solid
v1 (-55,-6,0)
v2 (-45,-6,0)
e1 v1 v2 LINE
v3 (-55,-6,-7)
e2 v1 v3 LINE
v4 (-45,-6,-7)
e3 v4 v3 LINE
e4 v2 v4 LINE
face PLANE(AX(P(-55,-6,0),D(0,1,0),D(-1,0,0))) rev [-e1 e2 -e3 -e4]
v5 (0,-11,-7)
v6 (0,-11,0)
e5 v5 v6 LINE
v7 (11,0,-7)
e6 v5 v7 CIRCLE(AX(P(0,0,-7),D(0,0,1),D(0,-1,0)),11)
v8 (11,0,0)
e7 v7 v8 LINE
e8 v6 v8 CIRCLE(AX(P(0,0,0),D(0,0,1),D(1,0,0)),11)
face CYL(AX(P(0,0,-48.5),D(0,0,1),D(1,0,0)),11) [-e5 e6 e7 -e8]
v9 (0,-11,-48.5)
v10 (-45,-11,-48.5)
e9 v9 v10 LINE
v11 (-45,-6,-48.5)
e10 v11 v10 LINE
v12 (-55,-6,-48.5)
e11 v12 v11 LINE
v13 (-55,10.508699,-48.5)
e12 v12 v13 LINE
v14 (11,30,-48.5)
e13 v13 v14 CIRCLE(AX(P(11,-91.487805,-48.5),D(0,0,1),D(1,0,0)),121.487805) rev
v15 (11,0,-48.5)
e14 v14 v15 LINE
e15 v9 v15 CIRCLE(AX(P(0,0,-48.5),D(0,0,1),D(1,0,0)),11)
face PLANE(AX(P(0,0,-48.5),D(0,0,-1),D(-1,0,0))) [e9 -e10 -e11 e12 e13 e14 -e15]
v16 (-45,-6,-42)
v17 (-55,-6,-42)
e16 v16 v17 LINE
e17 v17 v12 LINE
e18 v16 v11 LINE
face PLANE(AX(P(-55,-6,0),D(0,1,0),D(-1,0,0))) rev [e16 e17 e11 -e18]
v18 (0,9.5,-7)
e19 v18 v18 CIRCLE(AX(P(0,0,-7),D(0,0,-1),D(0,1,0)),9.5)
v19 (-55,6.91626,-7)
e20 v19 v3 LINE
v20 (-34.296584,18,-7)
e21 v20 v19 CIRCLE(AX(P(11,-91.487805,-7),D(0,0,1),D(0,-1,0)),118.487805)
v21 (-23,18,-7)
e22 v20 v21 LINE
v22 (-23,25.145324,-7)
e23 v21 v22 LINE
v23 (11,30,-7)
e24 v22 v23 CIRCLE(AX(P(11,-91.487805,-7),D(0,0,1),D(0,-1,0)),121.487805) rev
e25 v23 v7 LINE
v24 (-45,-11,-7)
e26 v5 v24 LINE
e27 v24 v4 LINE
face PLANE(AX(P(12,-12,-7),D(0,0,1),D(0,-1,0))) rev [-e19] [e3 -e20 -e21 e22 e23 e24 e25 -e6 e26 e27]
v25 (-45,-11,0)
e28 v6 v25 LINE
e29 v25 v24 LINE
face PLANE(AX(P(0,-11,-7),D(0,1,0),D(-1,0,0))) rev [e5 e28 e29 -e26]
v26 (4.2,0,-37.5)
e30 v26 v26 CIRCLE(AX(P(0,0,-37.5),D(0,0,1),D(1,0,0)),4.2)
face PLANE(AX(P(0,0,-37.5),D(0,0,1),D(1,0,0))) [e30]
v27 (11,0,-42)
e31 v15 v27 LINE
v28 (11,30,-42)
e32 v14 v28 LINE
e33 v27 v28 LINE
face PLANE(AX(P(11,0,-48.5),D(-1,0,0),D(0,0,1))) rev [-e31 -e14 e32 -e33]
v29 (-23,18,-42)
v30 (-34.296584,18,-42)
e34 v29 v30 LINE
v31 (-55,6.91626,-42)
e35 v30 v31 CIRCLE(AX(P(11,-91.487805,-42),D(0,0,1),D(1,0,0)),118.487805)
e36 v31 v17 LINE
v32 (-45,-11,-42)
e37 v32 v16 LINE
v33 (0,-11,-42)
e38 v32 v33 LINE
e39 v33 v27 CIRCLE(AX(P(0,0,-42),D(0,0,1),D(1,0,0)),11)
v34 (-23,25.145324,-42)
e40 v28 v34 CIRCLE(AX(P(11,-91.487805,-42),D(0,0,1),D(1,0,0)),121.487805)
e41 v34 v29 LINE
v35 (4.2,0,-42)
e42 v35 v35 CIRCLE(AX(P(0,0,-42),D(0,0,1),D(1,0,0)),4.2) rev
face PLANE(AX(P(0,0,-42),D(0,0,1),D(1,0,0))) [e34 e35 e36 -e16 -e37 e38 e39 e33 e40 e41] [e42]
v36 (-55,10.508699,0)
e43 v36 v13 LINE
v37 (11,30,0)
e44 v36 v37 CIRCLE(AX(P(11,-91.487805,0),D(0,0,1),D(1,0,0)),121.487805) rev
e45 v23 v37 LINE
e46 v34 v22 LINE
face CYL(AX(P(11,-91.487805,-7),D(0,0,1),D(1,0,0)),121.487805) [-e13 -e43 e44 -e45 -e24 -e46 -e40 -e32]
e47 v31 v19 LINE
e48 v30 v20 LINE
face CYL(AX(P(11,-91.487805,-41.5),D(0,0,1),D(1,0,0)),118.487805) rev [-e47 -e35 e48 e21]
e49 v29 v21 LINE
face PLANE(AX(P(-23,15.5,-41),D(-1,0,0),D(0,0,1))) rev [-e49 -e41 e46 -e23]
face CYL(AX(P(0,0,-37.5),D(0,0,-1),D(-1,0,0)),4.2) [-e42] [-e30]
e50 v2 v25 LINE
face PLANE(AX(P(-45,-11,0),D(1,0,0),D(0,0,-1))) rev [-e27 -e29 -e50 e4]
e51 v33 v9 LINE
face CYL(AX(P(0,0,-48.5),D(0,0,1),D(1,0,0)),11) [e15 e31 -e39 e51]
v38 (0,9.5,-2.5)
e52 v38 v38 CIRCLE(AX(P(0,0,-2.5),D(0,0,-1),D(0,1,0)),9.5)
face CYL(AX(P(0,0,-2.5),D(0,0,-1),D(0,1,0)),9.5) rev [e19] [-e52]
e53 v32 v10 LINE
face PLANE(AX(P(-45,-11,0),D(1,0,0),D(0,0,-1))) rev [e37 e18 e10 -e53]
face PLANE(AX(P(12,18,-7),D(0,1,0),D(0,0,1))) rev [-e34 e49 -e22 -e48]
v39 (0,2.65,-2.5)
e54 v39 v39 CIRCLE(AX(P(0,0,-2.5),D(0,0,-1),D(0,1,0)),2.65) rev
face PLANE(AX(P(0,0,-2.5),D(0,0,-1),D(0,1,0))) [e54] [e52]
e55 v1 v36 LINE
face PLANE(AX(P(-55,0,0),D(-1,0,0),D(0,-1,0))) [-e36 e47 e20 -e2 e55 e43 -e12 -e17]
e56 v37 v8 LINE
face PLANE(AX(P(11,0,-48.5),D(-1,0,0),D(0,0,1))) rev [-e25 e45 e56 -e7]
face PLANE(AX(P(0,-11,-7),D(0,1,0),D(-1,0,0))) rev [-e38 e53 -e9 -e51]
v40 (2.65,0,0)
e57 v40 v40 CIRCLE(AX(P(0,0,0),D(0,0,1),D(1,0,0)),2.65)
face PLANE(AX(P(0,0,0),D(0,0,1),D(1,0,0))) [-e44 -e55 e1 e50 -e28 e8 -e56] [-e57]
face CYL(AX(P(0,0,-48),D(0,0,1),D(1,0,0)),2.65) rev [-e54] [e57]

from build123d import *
from build123d.topology import SkipClean

# Parameters (mm, degrees)
SKETCH1_R              = 9.5
BOSS_EXTRUDE1_DEPTH    = 48
CUT_EXTRUDE1_DEPTH     = 62.48170459575759
BOSS_EXTRUDE2_START    = -2.5
SKETCH3_R              = 9.5
SKETCH3_R_2            = 2.4
BOSS_EXTRUDE2_DEPTH    = 2.5
SKETCH4_R              = 9.5
SKETCH4_R_2            = 4.2
BOSS_EXTRUDE3_DEPTH    = 7
SKETCH5_R              = 4.2
BOSS_EXTRUDE4_DEPTH    = 11
BOSS_EXTRUDE5_DEPTH    = 48
CUT_EXTRUDE2_START     = -48
CUT_EXTRUDE2_OUTLINE_R = 2.65
CUT_EXTRUDE2_DEPTH     = 48
CUT_EXTRUDE3_START     = -4.5
SKETCH8_R              = 9.5
CUT_EXTRUDE3_DEPTH     = 4.5
SKETCH9_R              = 6.067807638148196
CUT_EXTRUDE4_DEPTH     = 4.5
SKETCH10_R             = 9.5
BOSS_EXTRUDE6_DEPTH    = 4.5
SKETCH11_R             = 4.2
BOSS_EXTRUDE7_DEPTH    = 3.5
SKETCH12_R             = 2.4
BOSS_EXTRUDE8_DEPTH    = 2.5
CUT_EXTRUDE5_DEPTH     = 14.500000000000005
SKETCH15_R             = 3.436413098279149
BOSS_EXTRUDE9_DEPTH    = 10
BOSS_EXTRUDE10_DEPTH   = 0.5
SKETCH18_R             = 4.2
CUT_EXTRUDE8_DEPTH     = 0.5
CUT_EXTRUDE9_DEPTH     = 69.52919086053767
BOSS_EXTRUDE11_DEPTH   = 6.9999999999999964
CUT_EXTRUDE10_DEPTH    = 99.24586505293748
BOSS_EXTRUDE12_DEPTH   = 41.5
SKETCH25_R             = 4.2
CUT_EXTRUDE11_DEPTH    = 0.5
CUT_EXTRUDE12_DEPTH    = 99.24586505293753
CUT_EXTRUDE13_DEPTH    = 80.2290981899959


# Read off the part's stored shape, not the designer's step: Cut-Extrude2
with BuildPart() as part:
    # Sketch1 → Boss-Extrude1 (new body)
    with BuildSketch(Plane.XY):
        with BuildLine():
            Line((-12, 0), (-12, 30))
            Line((-12, 30), (12, 30))
            Line((12, 30), (12, 0))
            ThreePointArc((12, 0), (-2.2e-15, -12), (-12, 0))
        make_face()
        Circle(SKETCH1_R, mode=Mode.SUBTRACT)
    extrude(amount=-BOSS_EXTRUDE1_DEPTH)

    # Sketch2 → Cut-Extrude1 (cut, through all)
    with BuildSketch(Plane.ZY.offset(12)):
        Polygon((-6.999999999999999, -12), (-41, -12.000000000000004), (-41, 18), (-7.000000000000001, 18.000000000000004), align=None)
    extrude(amount=-CUT_EXTRUDE1_DEPTH, mode=Mode.SUBTRACT)

    # Sketch3 → Boss-Extrude2 (add)
    with BuildSketch(Plane(origin=(0, 0, -48), x_dir=(-1, 0, 0), z_dir=(0, 0, -1)).offset(BOSS_EXTRUDE2_START)):
        Circle(SKETCH3_R)
        Circle(SKETCH3_R_2, mode=Mode.SUBTRACT)
    extrude(amount=BOSS_EXTRUDE2_DEPTH)

    # Sketch4 → Boss-Extrude3 (add)
    with BuildSketch(Plane.XY):
        with Locations(Location((0, 0, 0), (0, 0, 180))):
            Circle(SKETCH4_R)
        Circle(SKETCH4_R_2, mode=Mode.SUBTRACT)
    extrude(amount=-BOSS_EXTRUDE3_DEPTH)

    # Sketch5 → Boss-Extrude4 (add)
    with BuildSketch(Plane.XY):
        Circle(SKETCH5_R)
    extrude(amount=-BOSS_EXTRUDE4_DEPTH)

    # Sketch6 → Boss-Extrude5 (add)
    with BuildSketch(Plane(origin=(0, 0, -48), x_dir=(-1, 0, 0), z_dir=(0, 0, -1))):
        Polygon((12, 30), (12, 18), (17.999999999999925, 18), (38.00000000000001, 18), (38.00000000000001, 30), align=None)
    extrude(amount=-BOSS_EXTRUDE5_DEPTH)

    # Cut-Extrude2 outline → Cut-Extrude2 (cut)
    with BuildSketch(Plane.XY.offset(CUT_EXTRUDE2_START)):
        Circle(CUT_EXTRUDE2_OUTLINE_R)
    extrude(amount=CUT_EXTRUDE2_DEPTH, mode=Mode.SUBTRACT)

    # Sketch8 → Cut-Extrude3 (cut)
    with BuildSketch(Plane(origin=(0, -4e-16, -7), x_dir=(-1, 0, 0), z_dir=(0, -6e-17, -1)).offset(CUT_EXTRUDE3_START)):
        Circle(SKETCH8_R)
    extrude(amount=CUT_EXTRUDE3_DEPTH, mode=Mode.SUBTRACT)


with BuildPart() as cut_extrude3_piece_1:
    # of the separate pieces the step leaves, piece 1, a body of its own (cut_extrude3_pieces)
    add(part.part.solids().sort_by_distance((-12, 0, 0))[0])

    # Sketch10 → Boss-Extrude6 (add)
    with BuildSketch(Plane.XY.offset(-45.5)):
        with Locations(Location((0, 0, 0), (0, 0, 90))):
            Circle(SKETCH10_R)
    extrude(amount=BOSS_EXTRUDE6_DEPTH)

    # Sketch11 → Boss-Extrude7 (add)
    with BuildSketch(Plane.XY.offset(-41)):
        with Locations(Location((0, 0, 0), (0, 0, 180))):
            Circle(SKETCH11_R)
    extrude(amount=BOSS_EXTRUDE7_DEPTH)

    # Sketch12 → Boss-Extrude8 (add)
    with BuildSketch(Plane(origin=(0, 0, -48), x_dir=(-1, 0, 0), z_dir=(0, 0, -1))):
        Circle(SKETCH12_R)
    extrude(amount=-BOSS_EXTRUDE8_DEPTH)

    # Sketch13 → Cut-Extrude5 (cut)
    with BuildSketch(Plane(origin=(0, 30, 0), x_dir=(1, 0, 0), z_dir=(0, 1, 0))):
        Polygon((12, 41), (-23.000000000000004, 41), (-22.999999999999996, 6.999999999999988), (12, 7.000000000000001), align=None)
    extrude(amount=-CUT_EXTRUDE5_DEPTH, mode=Mode.SUBTRACT)

    # Sketch15 → Boss-Extrude9 (add)
    with BuildSketch(Plane(origin=(0, 0, -48), x_dir=(-1, 0, 0), z_dir=(0, 0, -1))):
        Circle(SKETCH15_R)
    extrude(amount=-BOSS_EXTRUDE9_DEPTH)

    # Sketch16 → Boss-Extrude10 (add)
    with BuildSketch(Plane(origin=(0, 0, -48), x_dir=(-1, 0, 0), z_dir=(0, 0, -1))):
        Polygon((38.00000000000001, 30), (-12, 30), (-12, 18), (12, 18), (38.00000000000001, 18), align=None)
        with BuildLine():
            Line((-12, 0), (11.999999999999998, 0))
            ThreePointArc((11.999999999999998, 0), (-2.2e-15, -12), (-12, 0))
        make_face()
        with BuildLine():
            ThreePointArc((11.999999999999998, 0), (7.3e-16, 11.999999999999998), (-11.999999999999998, 1.47e-15))
            Line((-12, 0), (12, 0))
        make_face()
        with BuildLine():
            Line((12, 0), (-12, 0))
            ThreePointArc((-11.999999999999998, 1.47e-15), (-2.2e-15, -11.999999999999998), (11.999999999999998, -2.94e-15))
        make_face()
        with BuildLine():
            Line((12, 18), (-12, 18))
            Line((-12, 18), (-12, 0))
            ThreePointArc((-11.999999999999998, 1.47e-15), (7.3e-16, 11.999999999999998), (11.999999999999998, 0))
            Line((11.999999999999998, 0), (11.999999999999998, 18))
        make_face()
    extrude(amount=BOSS_EXTRUDE10_DEPTH)

    # Sketch18 → Cut-Extrude8 (cut)
    with SkipClean():  # the faces are left unmerged after this step: merging them gives an invalid solid
        with BuildSketch(Plane.XY.offset(-41)):
            with BuildLine():
                Line((12.000000000000004, 30), (-22.999999999999996, 30))
                Line((-22.999999999999996, 30), (-22.999999999999996, 18))
                Line((-22.999999999999996, 18), (-12.000000000000002, 18))
                Line((-12.000000000000002, 18), (-12.000000000000002, 0))
                ThreePointArc((-12, 1.47e-15), (-2.2e-15, -12), (12, -2.94e-15))
                Line((12, 0), (12, 30))
            make_face()
            Circle(SKETCH18_R, mode=Mode.SUBTRACT)
        extrude(amount=-CUT_EXTRUDE8_DEPTH, mode=Mode.SUBTRACT)

    # Sketch19 → Cut-Extrude9 (cut, through all)
    with SkipClean():  # the faces are left unmerged after this step: merging them gives an invalid solid
        with BuildSketch(Plane.XY):
            with BuildLine():
                ThreePointArc((11, -2.69e-15), (-2.02e-15, -11), (-11, 1.35e-15))
                Line((-11, 0), (-12.000000000000002, 0))
                ThreePointArc((-12.000000000000002, 0), (-7.3e-16, -12.000000000000002), (12.000000000000002, -1.47e-15))
                Line((12, 0), (12, 30))
                Line((12, 30), (11, 30))
                Line((11, 30), (11, 0))
            make_face()
        extrude(amount=-CUT_EXTRUDE9_DEPTH, mode=Mode.SUBTRACT)

    # Sketch21 → Boss-Extrude11 (add)
    with SkipClean():  # the faces are left unmerged after this step: merging them gives an invalid solid
        with BuildSketch(Plane.XY):
            with BuildLine():
                Line((-80, -11.000000000000007), (-2.02e-15, -11))
                ThreePointArc((-2.02e-15, -11), (-11, 7.951e-14), (1.5455e-13, 11))
                Line((-9.4e-16, 11), (-2e-17, 29.50098275984317))
                ThreePointArc((1.58451e-12, 29.500982759843026), (-43.87333050880174, 16.901328954446853), (-79.99999999999999, -11.000000000000014))
            make_face()
        boss_extrude11 = extrude(amount=-BOSS_EXTRUDE11_DEPTH)

    # Mirror2: Boss-Extrude11 across plane
    with SkipClean():  # the faces are left unmerged after this step: merging them gives an invalid solid
        add(boss_extrude11.mirror(Plane.XY.offset(-24.25)))

    # Sketch23 → Cut-Extrude10 (cut, through all)
    with SkipClean():  # the faces are left unmerged after this step: merging them gives an invalid solid
        with BuildSketch(Plane.XY):
            with BuildLine():
                Line((11, 30), (-38.00000000000001, 30))
                Line((-38.00000000000001, 30), (-38.00000000000001, 19.680026503546667))
                ThreePointArc((-38.000000000000014, 19.680026503546685), (-14.03748116807828, 27.39201372395351), (10.999999999999979, 30.00000000000003))
            make_face()
        extrude(amount=-CUT_EXTRUDE10_DEPTH, mode=Mode.SUBTRACT)

    # Sketch24 → Boss-Extrude12 (add)
    with BuildSketch(Plane.XY):
        with BuildLine():
            ThreePointArc((-23.00000000000003, 25.145323923706542), (-54.060518829682096, 11.110516861146493), (-80, -11))
            Line((-80, -11.000000000000007), (-75.95443157615205, -11.000000000000004))
            ThreePointArc((-75.95443157615205, -11.000000000000028), (-51.689916223605806, 9.057380529785846), (-22.999999999999986, 22.017084465179764))
            Line((-22.999999999999996, 22.017084465179774), (-23, 25.1453239237065))
        make_face()
    extrude(amount=-BOSS_EXTRUDE12_DEPTH)

    # Sketch25 → Cut-Extrude11 (cut)
    # profile 1 of 4: a face of its own
    with BuildSketch(Plane.XY.offset(-41.5)):
        with BuildLine():
            ThreePointArc((-34.29658362177963, 17.999999999999986), (-56.6966229233105, 5.756871837942555), (-75.95443157615205, -11.000000000000028))
            Line((-75.95443157615205, -11.000000000000007), (0, -11.000000000000007))
            ThreePointArc((-2.02e-15, -11), (-7.778174593052022, 7.778174593052023), (11, 0))
            Line((10.999999999999988, 0), (10.999999999999988, 26.999999999999993))
            ThreePointArc((10.999999999999988, 26.999999999999986), (-6.181599512464837, 25.74765282571859), (-22.999999999996817, 22.017084465180716))
            Line((-23, 22.01708446518151), (-23.000000000000004, 18))
            Line((-23.000000000000004, 18), (-34.29658362177963, 18.000000000000004))
        make_face()
    # profile 2 of 4: a face of its own
    with BuildSketch(Plane.XY.offset(-41.5)):
        with BuildLine():
            ThreePointArc((11, 0), (-7.778174593052022, 7.778174593052023), (-2.02e-15, -11))
            ThreePointArc((-2.02e-15, -11), (7.778174593052021, -7.778174593052024), (11, -2.69e-15))
        make_face()
        Circle(SKETCH25_R, mode=Mode.SUBTRACT)
    # profile 3 of 4: a face of its own
    with BuildSketch(Plane.XY.offset(-41.5)):
        with BuildLine():
            Line((-15.831452239273311, 26.999999999999996), (10.999999999999986, 26.999999999999996))
            Line((11, 26.999999999999996), (11, 30))
            ThreePointArc((10.999999999999591, 30), (-2.49932247622473, 29.24767054972125), (-15.83145223927318, 26.99999999999892))
        make_face()
    # profile 4 of 4: a face of its own
    with BuildSketch(Plane.XY.offset(-41.5)):
        with BuildLine():
            ThreePointArc((-15.83145223927318, 26.99999999999892), (-19.4298595333881, 26.127289318508147), (-22.99999999999981, 25.145323923705888))
            Line((-23, 25.14532392370651), (-23, 22.01708446518151))
            ThreePointArc((-22.999999999996817, 22.017084465180716), (-6.181599512464837, 25.74765282571859), (10.999999999999988, 26.999999999999986))
            Line((10.999999999999986, 26.999999999999996), (-15.831452239273311, 26.999999999999996))
        make_face()
    extrude(amount=-CUT_EXTRUDE11_DEPTH, mode=Mode.SUBTRACT)

    # Sketch26 → Cut-Extrude12 (cut, through all)
    with BuildSketch(Plane(origin=(0, 0, -48.5), x_dir=(-1, 0, 0), z_dir=(0, 0, -1))):
        with BuildLine():
            Line((54.999999999999986, 4.498697742403834), (54.99999999999999, -11))
            Line((55, -11), (70, -11))
            Line((70, -11), (73.20879972555869, -11.000000000000004))
            ThreePointArc((73.2087997255591, -10.99999999999882), (64.50313428378952, -2.7821940147532445), (55.00000000000103, 4.498697742404204))
        make_face()
        with BuildLine():
            Line((54.99999999999998, 10.508698660488534), (54.999999999999986, 4.498697742403834))
            ThreePointArc((55.00000000000103, 4.498697742404204), (64.50313428378952, -2.7821940147532445), (73.2087997255591, -10.99999999999882))
            Line((73.20879972555869, -11.000000000000004), (80, -11.00000000000001))
            ThreePointArc((80, -11), (68.23323816124723, 0.6066070293515935), (54.999999999999986, 10.508698660488534))
        make_face()
    extrude(amount=-CUT_EXTRUDE12_DEPTH, mode=Mode.SUBTRACT)

    # Sketch27 → Cut-Extrude13 (cut, through all)
    with BuildSketch(Plane(origin=(0, 0, -48.5), x_dir=(-1, 0, 0), z_dir=(0, 0, -1))):
        Polygon((54.999999999999986, -11.000000000000005), (44.999999999999986, -11.000000000000007), (44.999999999999986, -6.000000000000005), (54.999999999999986, -6.000000000000004), align=None)
    extrude(amount=-CUT_EXTRUDE13_DEPTH, mode=Mode.SUBTRACT)


with BuildPart() as cut_extrude3_piece_2:
    # of the separate pieces the step leaves, piece 2, a body of its own (cut_extrude3_pieces)
    add(part.part.solids().sort_by_distance((4.2, 0, -7))[0])

    # Sketch9 → Cut-Extrude4 (cut)
    with BuildSketch(Plane(origin=(0, 0, -11), x_dir=(-1, 0, 0), z_dir=(0, 0, -1))):
        Circle(SKETCH9_R)
    extrude(amount=-CUT_EXTRUDE4_DEPTH, mode=Mode.SUBTRACT)


solid = cut_extrude3_piece_1.part
